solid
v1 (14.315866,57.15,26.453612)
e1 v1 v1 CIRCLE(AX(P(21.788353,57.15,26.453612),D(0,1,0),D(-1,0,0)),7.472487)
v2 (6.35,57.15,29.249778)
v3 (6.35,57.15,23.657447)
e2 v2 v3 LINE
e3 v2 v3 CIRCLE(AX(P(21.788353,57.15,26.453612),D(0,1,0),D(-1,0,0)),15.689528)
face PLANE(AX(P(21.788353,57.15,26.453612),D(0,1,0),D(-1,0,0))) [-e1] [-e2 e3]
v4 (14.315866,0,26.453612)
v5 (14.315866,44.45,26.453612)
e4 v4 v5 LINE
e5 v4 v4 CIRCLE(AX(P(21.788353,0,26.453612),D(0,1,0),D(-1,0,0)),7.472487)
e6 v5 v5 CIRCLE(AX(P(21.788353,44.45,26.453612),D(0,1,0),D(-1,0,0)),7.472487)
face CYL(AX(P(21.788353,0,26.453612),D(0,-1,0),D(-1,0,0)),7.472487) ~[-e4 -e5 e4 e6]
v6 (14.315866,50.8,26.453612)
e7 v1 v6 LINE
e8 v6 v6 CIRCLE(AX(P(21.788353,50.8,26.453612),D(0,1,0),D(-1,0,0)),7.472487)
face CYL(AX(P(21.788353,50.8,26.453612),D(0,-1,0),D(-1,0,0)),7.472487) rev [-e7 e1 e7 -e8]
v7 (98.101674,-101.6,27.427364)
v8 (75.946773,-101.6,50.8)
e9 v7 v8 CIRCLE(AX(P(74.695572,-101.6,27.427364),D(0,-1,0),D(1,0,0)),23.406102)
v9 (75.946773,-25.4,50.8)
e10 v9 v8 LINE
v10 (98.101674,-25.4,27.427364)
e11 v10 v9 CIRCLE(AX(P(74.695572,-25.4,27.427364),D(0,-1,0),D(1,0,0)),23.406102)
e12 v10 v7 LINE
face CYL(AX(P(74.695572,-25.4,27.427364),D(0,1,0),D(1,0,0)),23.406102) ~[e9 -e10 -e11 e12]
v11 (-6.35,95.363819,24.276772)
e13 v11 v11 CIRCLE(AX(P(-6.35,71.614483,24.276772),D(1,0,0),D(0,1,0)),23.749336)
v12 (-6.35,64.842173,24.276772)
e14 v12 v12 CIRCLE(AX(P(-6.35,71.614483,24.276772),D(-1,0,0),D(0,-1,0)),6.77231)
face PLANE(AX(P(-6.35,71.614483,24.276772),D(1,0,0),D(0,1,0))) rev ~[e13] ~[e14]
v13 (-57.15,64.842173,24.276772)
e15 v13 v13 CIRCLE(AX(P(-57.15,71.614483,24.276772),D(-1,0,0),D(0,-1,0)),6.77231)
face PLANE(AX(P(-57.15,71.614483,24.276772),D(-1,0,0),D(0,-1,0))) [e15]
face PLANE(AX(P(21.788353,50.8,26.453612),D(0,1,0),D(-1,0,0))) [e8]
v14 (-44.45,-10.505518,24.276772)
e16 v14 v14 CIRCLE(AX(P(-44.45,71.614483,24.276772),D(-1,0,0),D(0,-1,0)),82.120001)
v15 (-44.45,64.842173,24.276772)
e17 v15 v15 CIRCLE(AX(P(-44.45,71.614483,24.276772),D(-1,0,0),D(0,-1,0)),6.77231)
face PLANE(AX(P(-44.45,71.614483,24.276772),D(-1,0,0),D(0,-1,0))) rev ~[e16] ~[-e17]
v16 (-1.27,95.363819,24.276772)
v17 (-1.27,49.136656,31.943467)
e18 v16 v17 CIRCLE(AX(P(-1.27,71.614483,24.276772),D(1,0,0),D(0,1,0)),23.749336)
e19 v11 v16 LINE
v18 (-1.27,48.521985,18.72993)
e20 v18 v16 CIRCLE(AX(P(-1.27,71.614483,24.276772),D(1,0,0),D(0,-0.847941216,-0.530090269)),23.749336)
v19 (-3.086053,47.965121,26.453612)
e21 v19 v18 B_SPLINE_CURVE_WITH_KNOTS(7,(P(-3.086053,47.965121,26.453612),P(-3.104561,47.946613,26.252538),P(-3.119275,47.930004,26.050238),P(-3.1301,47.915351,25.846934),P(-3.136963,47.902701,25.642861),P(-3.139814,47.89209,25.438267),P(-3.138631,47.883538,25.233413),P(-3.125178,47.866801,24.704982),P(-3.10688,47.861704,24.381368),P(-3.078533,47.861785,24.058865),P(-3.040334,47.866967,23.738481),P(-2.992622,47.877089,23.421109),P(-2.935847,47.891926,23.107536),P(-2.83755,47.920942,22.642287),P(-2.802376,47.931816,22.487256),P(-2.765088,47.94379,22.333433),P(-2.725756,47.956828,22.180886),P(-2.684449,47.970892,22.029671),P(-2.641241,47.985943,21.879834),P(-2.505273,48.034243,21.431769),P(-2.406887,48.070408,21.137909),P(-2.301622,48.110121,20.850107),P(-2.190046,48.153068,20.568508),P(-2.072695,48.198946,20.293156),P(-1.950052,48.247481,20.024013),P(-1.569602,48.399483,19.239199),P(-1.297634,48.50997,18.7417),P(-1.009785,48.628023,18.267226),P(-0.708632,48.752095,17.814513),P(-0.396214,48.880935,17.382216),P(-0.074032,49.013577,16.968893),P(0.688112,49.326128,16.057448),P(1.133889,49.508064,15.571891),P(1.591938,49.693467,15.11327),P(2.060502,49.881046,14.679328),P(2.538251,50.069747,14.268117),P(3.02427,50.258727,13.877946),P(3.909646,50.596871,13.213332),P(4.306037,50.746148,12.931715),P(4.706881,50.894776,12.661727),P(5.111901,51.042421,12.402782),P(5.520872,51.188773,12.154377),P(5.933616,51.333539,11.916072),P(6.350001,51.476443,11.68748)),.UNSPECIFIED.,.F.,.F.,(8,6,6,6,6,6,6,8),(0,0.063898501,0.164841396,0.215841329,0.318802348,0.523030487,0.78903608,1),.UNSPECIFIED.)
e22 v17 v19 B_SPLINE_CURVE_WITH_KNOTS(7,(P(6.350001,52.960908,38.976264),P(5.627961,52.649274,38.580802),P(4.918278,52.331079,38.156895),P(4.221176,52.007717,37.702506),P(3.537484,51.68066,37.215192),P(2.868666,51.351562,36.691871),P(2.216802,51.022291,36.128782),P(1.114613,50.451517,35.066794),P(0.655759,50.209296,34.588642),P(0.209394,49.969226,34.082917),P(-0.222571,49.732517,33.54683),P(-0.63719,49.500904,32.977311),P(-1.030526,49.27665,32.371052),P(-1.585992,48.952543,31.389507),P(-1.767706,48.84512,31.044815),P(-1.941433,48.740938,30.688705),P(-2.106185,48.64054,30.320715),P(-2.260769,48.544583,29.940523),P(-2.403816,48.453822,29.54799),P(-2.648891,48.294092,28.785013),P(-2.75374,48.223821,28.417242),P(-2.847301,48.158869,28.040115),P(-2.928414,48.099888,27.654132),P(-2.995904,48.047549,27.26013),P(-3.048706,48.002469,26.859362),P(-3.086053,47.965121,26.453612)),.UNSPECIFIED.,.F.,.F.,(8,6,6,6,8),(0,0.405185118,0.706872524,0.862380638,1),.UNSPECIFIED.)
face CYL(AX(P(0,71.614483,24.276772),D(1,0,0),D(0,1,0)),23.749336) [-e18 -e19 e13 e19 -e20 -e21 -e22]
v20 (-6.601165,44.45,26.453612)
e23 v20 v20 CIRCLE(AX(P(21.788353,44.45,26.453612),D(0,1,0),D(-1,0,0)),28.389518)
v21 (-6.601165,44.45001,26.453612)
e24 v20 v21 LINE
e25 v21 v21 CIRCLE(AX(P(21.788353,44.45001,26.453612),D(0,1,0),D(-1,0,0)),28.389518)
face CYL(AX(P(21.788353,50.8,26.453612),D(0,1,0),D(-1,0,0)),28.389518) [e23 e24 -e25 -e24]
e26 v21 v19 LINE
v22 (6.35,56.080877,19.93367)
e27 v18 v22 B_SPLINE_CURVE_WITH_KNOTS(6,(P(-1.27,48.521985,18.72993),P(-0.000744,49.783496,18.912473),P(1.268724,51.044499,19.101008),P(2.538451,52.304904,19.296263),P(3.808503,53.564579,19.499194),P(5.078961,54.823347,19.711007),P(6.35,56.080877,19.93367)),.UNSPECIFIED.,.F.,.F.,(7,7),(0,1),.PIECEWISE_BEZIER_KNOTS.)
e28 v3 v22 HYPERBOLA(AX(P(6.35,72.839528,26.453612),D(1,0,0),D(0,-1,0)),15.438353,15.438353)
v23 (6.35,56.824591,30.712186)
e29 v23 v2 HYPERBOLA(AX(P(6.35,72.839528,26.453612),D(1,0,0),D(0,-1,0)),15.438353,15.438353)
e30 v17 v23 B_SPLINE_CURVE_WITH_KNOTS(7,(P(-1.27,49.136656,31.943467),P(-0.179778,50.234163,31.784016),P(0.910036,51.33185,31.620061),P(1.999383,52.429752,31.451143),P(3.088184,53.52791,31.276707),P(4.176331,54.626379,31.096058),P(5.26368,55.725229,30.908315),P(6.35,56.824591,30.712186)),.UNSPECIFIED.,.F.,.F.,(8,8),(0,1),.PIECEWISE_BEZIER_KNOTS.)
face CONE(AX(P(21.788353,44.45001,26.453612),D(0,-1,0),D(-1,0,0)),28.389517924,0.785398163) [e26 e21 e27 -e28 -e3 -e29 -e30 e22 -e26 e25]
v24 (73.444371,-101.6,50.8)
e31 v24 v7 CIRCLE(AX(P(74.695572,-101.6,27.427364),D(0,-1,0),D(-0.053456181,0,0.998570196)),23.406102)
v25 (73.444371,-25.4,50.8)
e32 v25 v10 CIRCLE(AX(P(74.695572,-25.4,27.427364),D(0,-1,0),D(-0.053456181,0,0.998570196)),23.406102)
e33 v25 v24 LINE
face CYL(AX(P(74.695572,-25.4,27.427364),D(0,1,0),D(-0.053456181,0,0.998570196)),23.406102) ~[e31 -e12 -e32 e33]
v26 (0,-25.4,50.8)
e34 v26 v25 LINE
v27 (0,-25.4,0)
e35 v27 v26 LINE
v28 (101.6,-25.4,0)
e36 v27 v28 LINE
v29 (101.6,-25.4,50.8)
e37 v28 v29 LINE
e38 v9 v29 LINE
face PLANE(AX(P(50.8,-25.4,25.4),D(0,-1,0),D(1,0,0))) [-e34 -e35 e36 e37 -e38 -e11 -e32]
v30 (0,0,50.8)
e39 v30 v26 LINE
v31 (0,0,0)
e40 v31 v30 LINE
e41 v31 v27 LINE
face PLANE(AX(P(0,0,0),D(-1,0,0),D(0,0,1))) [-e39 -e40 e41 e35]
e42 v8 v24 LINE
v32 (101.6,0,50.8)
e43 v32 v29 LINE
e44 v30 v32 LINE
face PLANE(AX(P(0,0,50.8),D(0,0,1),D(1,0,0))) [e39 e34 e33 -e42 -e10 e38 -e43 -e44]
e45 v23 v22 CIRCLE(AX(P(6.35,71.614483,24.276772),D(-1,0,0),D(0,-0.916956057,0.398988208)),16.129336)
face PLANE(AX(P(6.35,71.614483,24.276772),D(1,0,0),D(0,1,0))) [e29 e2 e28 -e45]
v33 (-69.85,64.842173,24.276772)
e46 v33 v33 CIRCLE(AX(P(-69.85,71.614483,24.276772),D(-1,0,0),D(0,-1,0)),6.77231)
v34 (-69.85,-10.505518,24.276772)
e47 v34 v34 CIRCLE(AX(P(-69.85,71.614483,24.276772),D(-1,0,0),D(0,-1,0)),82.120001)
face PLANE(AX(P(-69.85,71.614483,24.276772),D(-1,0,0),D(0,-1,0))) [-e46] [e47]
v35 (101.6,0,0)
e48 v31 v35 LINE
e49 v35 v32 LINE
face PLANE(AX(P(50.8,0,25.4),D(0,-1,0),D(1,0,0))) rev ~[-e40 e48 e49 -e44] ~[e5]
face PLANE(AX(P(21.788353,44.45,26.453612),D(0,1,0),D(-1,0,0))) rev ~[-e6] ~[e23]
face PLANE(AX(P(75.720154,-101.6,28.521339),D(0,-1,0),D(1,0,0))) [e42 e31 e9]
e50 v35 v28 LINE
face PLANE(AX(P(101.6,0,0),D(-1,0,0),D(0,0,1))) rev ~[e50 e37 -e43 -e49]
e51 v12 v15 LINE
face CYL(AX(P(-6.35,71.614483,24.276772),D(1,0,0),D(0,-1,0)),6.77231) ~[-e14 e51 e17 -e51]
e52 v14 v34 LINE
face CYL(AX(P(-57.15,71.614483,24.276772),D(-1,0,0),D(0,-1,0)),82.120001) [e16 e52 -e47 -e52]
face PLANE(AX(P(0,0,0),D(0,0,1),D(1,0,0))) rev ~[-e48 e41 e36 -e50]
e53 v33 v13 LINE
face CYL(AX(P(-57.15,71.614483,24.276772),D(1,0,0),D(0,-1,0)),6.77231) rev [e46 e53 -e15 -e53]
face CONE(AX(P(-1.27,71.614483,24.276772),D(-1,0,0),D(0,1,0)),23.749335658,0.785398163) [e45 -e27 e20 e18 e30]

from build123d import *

# Parameters (mm, degrees)
F0_W      = 101.6
F0_H      = 50.8
F1_DEPTH  = 25.4
F3_DEPTH  = 76.2
F4_R      = 7.4724872864
F5_DEPTH  = 50.8
F6_R      = 28.3895179235
F6_R_2    = 7.4724872864
F7_DEPTH  = 6.35
F8_SIZE   = 12.69999
F9_R      = 23.7493356576
F10_DEPTH = 6.35
F11_SIZE  = 7.62
F12_R     = 6.7723102527
F13_DEPTH = 50.8
F14_R     = 82.1200007596
F14_R_2   = 6.7723102527
F15_DEPTH = 12.7


# Not quite as in the source:
# - a fillet or chamfer is up to 0.001 mm smaller than in the source, because OpenCascade refuses the exact size


with BuildPart() as f1:
    # F0 (on Front) → F1 (new body)
    with BuildSketch(Plane.XZ):
        with Locations((50.8, 25.4)):
            Rectangle(F0_W, F0_H)
    extrude(amount=F1_DEPTH)

    # F2 (on face) → F3 (join)
    with BuildSketch(Plane.XZ.offset(25.4)):
        with BuildLine():
            ThreePointArc((73.4443714217, 50.8), (58.5934004133, 10.4401432835), (98.1016742507, 27.4273641407))
            ThreePointArc((98.1016742507, 27.4273641407), (91.6827931143, 43.5295359845), (75.9467730924, 50.8))
            Line((75.9467730924, 50.8), (73.4443714217, 50.8))
        make_face()
    extrude(amount=F3_DEPTH)

    # F4 (on face) → F5 (join)
    with BuildSketch(Plane(origin=(0, 0, 0), x_dir=(-1, 0, 0), z_dir=(0, 1, 0))):
        with Locations((-21.7883531004, 26.4536123723)):
            Circle(F4_R)
    extrude(amount=F5_DEPTH)

    # F6 (on face) → F7 (join, symmetric)
    with BuildSketch(Plane(origin=(0, 50.8, 0), x_dir=(-1, 0, 0), z_dir=(0, 1, 0))):
        with Locations((-21.7883531004, 26.4536123723)):
            Circle(F6_R)
        with Locations((-21.7883531004, 26.4536123723)):
            Circle(F6_R_2, mode=Mode.SUBTRACT)
    extrude(amount=F7_DEPTH, both=True)

    # F8 (size 12.7 in the source; OpenCascade refuses exactly that, so slightly less here)
    f8_edges = [f1.edges().sort_by_distance(p)[0] for p in [
        (50.177871, 57.15, 26.453612),
    ]]
    chamfer(f8_edges, length=F8_SIZE)

    # F9 (on Right) → F10 (join, symmetric)
    with BuildSketch(Plane.YZ):
        with Locations((71.6144831948, 24.2767716783)):
            Circle(F9_R)
    extrude(amount=F10_DEPTH, both=True)

    # F11
    f11_edges = [f1.edges().sort_by_distance(p)[0] for p in [
        (6.35, 79.39333, 46.716034),
        (6.35, 78.162989, 1.448105),
    ]]
    chamfer(f11_edges, length=F11_SIZE)

    # F12 (on face) → F13 (join)
    with BuildSketch(Plane(origin=(-6.35, 0, 0), x_dir=(0, -1, 0), z_dir=(-1, 0, 0))):
        with Locations((-71.6144831948, 24.2767716783)):
            Circle(F12_R)
    extrude(amount=F13_DEPTH)

    # F14 (on face) → F15 (join, symmetric)
    with BuildSketch(Plane(origin=(-57.15, 0, 0), x_dir=(0, -1, 0), z_dir=(-1, 0, 0))):
        with Locations((-71.6144831948, 24.2767716783)):
            Circle(F14_R)
        with Locations((-71.6144831948, 24.2767716783)):
            Circle(F14_R_2, mode=Mode.SUBTRACT)
    extrude(amount=F15_DEPTH, both=True)


solid = f1.part
